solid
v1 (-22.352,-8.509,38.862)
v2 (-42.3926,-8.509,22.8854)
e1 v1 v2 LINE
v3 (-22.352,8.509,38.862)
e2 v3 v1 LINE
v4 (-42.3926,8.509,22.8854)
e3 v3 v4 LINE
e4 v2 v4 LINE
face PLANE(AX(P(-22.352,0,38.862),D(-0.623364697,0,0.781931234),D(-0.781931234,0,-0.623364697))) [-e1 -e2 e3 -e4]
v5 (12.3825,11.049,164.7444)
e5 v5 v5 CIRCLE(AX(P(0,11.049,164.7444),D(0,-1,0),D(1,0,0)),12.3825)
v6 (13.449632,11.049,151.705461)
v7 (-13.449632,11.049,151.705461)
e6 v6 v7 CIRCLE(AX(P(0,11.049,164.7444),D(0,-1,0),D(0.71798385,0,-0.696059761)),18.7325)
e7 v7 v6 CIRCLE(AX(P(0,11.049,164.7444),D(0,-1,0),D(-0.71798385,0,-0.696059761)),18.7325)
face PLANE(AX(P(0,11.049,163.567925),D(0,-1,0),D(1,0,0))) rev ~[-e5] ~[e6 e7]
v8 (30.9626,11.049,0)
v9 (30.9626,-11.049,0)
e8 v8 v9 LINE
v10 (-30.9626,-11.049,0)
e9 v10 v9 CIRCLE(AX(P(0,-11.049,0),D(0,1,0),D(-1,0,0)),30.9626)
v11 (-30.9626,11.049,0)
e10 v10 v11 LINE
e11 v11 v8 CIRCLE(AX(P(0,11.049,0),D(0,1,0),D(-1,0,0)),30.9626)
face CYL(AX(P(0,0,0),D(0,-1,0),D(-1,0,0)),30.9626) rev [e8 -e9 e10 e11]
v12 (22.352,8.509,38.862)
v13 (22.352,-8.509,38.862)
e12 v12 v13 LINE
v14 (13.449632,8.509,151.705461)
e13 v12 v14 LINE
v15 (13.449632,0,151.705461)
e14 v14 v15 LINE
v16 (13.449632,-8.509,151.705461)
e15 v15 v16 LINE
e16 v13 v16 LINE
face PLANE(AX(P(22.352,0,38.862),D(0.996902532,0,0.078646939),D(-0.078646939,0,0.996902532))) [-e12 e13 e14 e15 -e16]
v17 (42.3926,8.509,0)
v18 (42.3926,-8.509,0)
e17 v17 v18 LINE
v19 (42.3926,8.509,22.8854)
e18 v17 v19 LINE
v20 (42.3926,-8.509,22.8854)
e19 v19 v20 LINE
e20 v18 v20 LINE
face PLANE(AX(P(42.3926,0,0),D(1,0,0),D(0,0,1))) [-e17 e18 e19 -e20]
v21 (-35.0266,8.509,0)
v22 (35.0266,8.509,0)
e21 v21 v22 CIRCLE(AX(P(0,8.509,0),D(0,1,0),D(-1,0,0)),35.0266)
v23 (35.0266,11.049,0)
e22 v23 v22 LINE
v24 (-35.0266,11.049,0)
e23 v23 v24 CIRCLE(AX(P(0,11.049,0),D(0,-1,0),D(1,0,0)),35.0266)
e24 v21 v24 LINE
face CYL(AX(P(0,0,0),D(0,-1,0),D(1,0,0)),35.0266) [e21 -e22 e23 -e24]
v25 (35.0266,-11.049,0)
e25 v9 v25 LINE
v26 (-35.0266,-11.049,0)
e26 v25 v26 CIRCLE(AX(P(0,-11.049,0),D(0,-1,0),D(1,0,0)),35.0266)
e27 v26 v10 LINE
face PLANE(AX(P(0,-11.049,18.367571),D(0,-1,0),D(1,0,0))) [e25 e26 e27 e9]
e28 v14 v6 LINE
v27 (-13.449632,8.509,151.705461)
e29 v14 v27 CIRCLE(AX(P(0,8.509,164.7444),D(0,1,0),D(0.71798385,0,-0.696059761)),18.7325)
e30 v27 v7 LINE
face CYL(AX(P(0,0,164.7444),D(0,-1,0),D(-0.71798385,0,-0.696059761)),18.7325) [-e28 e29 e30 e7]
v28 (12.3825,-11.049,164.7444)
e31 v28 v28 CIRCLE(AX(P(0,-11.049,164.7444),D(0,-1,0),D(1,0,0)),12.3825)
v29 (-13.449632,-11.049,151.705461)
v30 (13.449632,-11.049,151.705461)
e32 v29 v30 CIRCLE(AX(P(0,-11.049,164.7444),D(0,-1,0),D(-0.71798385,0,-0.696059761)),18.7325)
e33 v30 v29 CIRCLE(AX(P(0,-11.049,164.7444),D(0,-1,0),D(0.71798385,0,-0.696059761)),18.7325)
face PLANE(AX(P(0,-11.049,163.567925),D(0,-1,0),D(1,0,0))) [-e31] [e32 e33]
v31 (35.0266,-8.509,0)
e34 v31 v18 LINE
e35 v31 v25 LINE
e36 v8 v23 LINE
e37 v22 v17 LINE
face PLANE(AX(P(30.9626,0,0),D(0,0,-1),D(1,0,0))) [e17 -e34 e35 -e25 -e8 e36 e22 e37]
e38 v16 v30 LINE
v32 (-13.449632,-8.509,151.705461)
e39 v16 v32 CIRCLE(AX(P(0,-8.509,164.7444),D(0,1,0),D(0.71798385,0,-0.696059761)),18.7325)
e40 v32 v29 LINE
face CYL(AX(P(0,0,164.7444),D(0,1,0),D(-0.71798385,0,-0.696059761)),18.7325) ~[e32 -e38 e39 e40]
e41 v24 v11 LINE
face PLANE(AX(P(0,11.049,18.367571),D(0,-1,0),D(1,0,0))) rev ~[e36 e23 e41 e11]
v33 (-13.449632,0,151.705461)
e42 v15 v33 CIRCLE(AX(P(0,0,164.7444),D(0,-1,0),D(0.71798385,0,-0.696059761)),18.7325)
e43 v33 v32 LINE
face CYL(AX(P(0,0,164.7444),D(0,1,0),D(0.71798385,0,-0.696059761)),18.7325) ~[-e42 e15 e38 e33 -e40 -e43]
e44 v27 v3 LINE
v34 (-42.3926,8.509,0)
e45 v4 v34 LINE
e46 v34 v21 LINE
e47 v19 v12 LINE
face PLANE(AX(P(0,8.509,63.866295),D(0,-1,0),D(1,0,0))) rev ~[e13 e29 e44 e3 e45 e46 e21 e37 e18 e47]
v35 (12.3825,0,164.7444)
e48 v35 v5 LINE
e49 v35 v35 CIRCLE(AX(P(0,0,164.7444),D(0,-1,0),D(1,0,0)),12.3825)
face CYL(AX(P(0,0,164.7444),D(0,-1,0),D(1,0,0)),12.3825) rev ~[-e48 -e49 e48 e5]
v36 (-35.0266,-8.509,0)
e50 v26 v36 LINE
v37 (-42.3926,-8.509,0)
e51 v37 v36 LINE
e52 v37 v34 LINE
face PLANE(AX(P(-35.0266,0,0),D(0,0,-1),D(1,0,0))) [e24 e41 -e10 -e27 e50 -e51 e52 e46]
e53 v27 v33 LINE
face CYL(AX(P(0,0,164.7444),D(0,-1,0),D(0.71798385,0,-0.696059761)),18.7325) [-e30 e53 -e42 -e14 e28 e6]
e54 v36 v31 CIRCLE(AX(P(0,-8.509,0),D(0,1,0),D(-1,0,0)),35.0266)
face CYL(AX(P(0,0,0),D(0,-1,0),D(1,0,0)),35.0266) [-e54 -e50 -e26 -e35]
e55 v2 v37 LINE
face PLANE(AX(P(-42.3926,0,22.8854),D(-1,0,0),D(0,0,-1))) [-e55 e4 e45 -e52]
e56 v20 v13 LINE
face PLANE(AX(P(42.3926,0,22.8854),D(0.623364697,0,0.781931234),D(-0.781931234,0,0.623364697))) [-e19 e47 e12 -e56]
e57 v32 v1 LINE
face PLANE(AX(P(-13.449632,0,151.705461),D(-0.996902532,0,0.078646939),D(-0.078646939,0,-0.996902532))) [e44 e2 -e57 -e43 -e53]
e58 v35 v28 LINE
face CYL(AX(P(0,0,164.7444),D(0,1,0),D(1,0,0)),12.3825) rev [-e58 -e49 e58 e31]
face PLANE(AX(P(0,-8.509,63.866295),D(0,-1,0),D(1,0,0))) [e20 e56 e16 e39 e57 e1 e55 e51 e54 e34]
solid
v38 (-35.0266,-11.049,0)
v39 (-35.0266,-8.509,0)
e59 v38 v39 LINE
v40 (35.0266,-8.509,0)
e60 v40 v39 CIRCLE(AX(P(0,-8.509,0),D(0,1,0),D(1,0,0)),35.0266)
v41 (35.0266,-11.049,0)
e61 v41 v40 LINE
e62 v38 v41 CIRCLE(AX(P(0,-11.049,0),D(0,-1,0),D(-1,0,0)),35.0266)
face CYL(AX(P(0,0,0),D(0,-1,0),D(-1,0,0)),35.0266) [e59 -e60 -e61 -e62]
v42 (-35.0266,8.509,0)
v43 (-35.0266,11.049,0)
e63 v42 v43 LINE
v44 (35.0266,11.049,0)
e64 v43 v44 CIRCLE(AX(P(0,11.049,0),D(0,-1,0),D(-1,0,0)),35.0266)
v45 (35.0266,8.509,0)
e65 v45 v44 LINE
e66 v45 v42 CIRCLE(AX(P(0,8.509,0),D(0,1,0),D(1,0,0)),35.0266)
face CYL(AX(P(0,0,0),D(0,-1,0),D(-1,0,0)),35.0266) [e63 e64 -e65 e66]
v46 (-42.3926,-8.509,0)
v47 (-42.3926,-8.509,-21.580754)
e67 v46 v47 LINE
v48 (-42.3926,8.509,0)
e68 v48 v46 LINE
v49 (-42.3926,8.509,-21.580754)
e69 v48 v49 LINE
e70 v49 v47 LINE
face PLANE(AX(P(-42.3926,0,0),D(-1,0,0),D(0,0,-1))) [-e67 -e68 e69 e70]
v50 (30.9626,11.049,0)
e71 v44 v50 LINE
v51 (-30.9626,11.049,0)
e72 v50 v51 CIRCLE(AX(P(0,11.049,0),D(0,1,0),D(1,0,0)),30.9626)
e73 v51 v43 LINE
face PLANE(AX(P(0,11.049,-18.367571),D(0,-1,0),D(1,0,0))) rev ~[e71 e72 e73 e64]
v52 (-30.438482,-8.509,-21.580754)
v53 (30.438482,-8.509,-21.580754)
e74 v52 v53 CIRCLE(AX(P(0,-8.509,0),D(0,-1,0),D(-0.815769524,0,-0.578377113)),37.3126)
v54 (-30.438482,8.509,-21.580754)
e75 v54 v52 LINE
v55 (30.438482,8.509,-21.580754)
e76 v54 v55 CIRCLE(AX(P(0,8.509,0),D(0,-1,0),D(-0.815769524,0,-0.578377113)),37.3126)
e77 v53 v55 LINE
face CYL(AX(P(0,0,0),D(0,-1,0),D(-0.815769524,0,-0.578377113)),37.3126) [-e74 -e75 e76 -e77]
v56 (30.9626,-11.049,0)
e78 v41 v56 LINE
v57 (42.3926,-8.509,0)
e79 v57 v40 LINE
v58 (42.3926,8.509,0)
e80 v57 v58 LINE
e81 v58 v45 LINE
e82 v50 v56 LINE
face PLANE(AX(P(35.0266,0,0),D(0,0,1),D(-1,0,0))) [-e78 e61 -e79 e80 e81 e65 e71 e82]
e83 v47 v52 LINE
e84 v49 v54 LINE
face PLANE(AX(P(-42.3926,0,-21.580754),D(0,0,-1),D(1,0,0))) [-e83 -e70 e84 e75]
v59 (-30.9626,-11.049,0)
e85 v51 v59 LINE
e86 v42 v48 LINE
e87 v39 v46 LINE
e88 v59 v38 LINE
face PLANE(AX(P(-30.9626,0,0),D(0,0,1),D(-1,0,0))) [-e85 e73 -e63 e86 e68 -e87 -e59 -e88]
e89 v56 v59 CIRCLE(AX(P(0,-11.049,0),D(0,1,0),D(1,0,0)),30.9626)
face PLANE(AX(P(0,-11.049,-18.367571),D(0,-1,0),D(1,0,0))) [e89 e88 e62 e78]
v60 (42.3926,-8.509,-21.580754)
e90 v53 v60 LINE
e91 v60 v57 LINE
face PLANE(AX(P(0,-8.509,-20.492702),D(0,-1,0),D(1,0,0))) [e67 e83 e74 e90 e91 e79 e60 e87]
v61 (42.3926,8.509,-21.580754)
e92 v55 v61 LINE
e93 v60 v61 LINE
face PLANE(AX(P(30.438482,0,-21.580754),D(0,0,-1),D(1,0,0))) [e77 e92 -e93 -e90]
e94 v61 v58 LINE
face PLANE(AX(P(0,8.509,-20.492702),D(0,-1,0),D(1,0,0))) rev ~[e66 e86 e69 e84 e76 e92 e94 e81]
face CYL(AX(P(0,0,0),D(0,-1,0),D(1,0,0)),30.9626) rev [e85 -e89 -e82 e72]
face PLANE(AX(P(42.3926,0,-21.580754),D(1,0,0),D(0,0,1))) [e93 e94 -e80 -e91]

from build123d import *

# Parameters (mm, degrees)
F1_DEPTH = 11.049
F2_DEPTH = 11.049
F3_DEPTH = 8.509
F0_R     = 12.3825
F4_DEPTH = 11.049
F5_DEPTH = 8.509


with BuildPart() as f1:
    # F0 (on Front) → F1 (new body, symmetric)
    with BuildSketch(Plane.XZ):
        with BuildLine():
            ThreePointArc((-30.9626, 0), (0, 30.9626), (30.9626, 0))
            Line((30.9626, 0), (35.0266, 0))
            ThreePointArc((35.0266, 0), (0, 35.0266), (-35.0266, 0))
            Line((-35.0266, 0), (-30.9626, 0))
        make_face()
    extrude(amount=F1_DEPTH, both=True)

    # F0 (on Front) → F3 (join, symmetric)
    with BuildSketch(Plane.XZ):
        with BuildLine():
            ThreePointArc((-35.0266, 0), (0, 35.0266), (35.0266, 0))
            Line((35.0266, 0), (42.3926, 0))
            Line((42.3926, 0), (42.3926, 22.8854))
            Line((42.3926, 22.8854), (22.352, 38.862))
            Line((22.352, 38.862), (13.4496324754, 151.7054605291))
            ThreePointArc((13.4496324754, 151.7054605291), (0, 146.0119), (-13.4496324754, 151.7054605291))
            Line((-13.4496324754, 151.7054605291), (-22.352, 38.862))
            Line((-22.352, 38.862), (-42.3926, 22.8854))
            Line((-42.3926, 22.8854), (-42.3926, 0))
            Line((-42.3926, 0), (-35.0266, 0))
        make_face()
    extrude(amount=F3_DEPTH, both=True)

    # F0 (on Front) → F4 (join, symmetric)
    with BuildSketch(Plane.XZ):
        with BuildLine():
            ThreePointArc((-13.4496324754, 151.7054605291), (0, 146.0119), (13.4496324754, 151.7054605291))
            ThreePointArc((13.4496324754, 151.7054605291), (17.361621419, 157.710151074), (18.7325, 164.7444))
            ThreePointArc((18.7325, 164.7444), (-7.034248926, 182.106021419), (-13.4496324754, 151.7054605291))
        make_face()
        with Locations((0, 164.7444)):
            Circle(F0_R, mode=Mode.SUBTRACT)
    extrude(amount=F4_DEPTH, both=True)


with BuildPart() as f2:
    # F0 (on Front) → F2 (new body, symmetric)
    with BuildSketch(Plane.XZ):
        with BuildLine():
            Line((35.0266, 0), (30.9626, 0))
            ThreePointArc((30.9626, 0), (0, -30.9626), (-30.9626, 0))
            Line((-30.9626, 0), (-35.0266, 0))
            ThreePointArc((-35.0266, 0), (0, -35.0266), (35.0266, 0))
        make_face()
    extrude(amount=F2_DEPTH, both=True)

    # F0 (on Front) → F5 (join, symmetric)
    with BuildSketch(Plane.XZ):
        with BuildLine():
            Line((42.3926, 0), (35.0266, 0))
            ThreePointArc((35.0266, 0), (0, -35.0266), (-35.0266, 0))
            Line((-35.0266, 0), (-42.3926, 0))
            Line((-42.3926, 0), (-42.3926, -21.580753848))
            Line((-42.3926, -21.580753848), (-30.4384819285, -21.580753848))
            ThreePointArc((-30.4384819285, -21.580753848), (0, -37.3126), (30.4384819285, -21.580753848))
            Line((30.4384819285, -21.580753848), (42.3926, -21.580753848))
            Line((42.3926, -21.580753848), (42.3926, 0))
        make_face()
    extrude(amount=F5_DEPTH, both=True)


solid = Compound([f1.part, f2.part])
